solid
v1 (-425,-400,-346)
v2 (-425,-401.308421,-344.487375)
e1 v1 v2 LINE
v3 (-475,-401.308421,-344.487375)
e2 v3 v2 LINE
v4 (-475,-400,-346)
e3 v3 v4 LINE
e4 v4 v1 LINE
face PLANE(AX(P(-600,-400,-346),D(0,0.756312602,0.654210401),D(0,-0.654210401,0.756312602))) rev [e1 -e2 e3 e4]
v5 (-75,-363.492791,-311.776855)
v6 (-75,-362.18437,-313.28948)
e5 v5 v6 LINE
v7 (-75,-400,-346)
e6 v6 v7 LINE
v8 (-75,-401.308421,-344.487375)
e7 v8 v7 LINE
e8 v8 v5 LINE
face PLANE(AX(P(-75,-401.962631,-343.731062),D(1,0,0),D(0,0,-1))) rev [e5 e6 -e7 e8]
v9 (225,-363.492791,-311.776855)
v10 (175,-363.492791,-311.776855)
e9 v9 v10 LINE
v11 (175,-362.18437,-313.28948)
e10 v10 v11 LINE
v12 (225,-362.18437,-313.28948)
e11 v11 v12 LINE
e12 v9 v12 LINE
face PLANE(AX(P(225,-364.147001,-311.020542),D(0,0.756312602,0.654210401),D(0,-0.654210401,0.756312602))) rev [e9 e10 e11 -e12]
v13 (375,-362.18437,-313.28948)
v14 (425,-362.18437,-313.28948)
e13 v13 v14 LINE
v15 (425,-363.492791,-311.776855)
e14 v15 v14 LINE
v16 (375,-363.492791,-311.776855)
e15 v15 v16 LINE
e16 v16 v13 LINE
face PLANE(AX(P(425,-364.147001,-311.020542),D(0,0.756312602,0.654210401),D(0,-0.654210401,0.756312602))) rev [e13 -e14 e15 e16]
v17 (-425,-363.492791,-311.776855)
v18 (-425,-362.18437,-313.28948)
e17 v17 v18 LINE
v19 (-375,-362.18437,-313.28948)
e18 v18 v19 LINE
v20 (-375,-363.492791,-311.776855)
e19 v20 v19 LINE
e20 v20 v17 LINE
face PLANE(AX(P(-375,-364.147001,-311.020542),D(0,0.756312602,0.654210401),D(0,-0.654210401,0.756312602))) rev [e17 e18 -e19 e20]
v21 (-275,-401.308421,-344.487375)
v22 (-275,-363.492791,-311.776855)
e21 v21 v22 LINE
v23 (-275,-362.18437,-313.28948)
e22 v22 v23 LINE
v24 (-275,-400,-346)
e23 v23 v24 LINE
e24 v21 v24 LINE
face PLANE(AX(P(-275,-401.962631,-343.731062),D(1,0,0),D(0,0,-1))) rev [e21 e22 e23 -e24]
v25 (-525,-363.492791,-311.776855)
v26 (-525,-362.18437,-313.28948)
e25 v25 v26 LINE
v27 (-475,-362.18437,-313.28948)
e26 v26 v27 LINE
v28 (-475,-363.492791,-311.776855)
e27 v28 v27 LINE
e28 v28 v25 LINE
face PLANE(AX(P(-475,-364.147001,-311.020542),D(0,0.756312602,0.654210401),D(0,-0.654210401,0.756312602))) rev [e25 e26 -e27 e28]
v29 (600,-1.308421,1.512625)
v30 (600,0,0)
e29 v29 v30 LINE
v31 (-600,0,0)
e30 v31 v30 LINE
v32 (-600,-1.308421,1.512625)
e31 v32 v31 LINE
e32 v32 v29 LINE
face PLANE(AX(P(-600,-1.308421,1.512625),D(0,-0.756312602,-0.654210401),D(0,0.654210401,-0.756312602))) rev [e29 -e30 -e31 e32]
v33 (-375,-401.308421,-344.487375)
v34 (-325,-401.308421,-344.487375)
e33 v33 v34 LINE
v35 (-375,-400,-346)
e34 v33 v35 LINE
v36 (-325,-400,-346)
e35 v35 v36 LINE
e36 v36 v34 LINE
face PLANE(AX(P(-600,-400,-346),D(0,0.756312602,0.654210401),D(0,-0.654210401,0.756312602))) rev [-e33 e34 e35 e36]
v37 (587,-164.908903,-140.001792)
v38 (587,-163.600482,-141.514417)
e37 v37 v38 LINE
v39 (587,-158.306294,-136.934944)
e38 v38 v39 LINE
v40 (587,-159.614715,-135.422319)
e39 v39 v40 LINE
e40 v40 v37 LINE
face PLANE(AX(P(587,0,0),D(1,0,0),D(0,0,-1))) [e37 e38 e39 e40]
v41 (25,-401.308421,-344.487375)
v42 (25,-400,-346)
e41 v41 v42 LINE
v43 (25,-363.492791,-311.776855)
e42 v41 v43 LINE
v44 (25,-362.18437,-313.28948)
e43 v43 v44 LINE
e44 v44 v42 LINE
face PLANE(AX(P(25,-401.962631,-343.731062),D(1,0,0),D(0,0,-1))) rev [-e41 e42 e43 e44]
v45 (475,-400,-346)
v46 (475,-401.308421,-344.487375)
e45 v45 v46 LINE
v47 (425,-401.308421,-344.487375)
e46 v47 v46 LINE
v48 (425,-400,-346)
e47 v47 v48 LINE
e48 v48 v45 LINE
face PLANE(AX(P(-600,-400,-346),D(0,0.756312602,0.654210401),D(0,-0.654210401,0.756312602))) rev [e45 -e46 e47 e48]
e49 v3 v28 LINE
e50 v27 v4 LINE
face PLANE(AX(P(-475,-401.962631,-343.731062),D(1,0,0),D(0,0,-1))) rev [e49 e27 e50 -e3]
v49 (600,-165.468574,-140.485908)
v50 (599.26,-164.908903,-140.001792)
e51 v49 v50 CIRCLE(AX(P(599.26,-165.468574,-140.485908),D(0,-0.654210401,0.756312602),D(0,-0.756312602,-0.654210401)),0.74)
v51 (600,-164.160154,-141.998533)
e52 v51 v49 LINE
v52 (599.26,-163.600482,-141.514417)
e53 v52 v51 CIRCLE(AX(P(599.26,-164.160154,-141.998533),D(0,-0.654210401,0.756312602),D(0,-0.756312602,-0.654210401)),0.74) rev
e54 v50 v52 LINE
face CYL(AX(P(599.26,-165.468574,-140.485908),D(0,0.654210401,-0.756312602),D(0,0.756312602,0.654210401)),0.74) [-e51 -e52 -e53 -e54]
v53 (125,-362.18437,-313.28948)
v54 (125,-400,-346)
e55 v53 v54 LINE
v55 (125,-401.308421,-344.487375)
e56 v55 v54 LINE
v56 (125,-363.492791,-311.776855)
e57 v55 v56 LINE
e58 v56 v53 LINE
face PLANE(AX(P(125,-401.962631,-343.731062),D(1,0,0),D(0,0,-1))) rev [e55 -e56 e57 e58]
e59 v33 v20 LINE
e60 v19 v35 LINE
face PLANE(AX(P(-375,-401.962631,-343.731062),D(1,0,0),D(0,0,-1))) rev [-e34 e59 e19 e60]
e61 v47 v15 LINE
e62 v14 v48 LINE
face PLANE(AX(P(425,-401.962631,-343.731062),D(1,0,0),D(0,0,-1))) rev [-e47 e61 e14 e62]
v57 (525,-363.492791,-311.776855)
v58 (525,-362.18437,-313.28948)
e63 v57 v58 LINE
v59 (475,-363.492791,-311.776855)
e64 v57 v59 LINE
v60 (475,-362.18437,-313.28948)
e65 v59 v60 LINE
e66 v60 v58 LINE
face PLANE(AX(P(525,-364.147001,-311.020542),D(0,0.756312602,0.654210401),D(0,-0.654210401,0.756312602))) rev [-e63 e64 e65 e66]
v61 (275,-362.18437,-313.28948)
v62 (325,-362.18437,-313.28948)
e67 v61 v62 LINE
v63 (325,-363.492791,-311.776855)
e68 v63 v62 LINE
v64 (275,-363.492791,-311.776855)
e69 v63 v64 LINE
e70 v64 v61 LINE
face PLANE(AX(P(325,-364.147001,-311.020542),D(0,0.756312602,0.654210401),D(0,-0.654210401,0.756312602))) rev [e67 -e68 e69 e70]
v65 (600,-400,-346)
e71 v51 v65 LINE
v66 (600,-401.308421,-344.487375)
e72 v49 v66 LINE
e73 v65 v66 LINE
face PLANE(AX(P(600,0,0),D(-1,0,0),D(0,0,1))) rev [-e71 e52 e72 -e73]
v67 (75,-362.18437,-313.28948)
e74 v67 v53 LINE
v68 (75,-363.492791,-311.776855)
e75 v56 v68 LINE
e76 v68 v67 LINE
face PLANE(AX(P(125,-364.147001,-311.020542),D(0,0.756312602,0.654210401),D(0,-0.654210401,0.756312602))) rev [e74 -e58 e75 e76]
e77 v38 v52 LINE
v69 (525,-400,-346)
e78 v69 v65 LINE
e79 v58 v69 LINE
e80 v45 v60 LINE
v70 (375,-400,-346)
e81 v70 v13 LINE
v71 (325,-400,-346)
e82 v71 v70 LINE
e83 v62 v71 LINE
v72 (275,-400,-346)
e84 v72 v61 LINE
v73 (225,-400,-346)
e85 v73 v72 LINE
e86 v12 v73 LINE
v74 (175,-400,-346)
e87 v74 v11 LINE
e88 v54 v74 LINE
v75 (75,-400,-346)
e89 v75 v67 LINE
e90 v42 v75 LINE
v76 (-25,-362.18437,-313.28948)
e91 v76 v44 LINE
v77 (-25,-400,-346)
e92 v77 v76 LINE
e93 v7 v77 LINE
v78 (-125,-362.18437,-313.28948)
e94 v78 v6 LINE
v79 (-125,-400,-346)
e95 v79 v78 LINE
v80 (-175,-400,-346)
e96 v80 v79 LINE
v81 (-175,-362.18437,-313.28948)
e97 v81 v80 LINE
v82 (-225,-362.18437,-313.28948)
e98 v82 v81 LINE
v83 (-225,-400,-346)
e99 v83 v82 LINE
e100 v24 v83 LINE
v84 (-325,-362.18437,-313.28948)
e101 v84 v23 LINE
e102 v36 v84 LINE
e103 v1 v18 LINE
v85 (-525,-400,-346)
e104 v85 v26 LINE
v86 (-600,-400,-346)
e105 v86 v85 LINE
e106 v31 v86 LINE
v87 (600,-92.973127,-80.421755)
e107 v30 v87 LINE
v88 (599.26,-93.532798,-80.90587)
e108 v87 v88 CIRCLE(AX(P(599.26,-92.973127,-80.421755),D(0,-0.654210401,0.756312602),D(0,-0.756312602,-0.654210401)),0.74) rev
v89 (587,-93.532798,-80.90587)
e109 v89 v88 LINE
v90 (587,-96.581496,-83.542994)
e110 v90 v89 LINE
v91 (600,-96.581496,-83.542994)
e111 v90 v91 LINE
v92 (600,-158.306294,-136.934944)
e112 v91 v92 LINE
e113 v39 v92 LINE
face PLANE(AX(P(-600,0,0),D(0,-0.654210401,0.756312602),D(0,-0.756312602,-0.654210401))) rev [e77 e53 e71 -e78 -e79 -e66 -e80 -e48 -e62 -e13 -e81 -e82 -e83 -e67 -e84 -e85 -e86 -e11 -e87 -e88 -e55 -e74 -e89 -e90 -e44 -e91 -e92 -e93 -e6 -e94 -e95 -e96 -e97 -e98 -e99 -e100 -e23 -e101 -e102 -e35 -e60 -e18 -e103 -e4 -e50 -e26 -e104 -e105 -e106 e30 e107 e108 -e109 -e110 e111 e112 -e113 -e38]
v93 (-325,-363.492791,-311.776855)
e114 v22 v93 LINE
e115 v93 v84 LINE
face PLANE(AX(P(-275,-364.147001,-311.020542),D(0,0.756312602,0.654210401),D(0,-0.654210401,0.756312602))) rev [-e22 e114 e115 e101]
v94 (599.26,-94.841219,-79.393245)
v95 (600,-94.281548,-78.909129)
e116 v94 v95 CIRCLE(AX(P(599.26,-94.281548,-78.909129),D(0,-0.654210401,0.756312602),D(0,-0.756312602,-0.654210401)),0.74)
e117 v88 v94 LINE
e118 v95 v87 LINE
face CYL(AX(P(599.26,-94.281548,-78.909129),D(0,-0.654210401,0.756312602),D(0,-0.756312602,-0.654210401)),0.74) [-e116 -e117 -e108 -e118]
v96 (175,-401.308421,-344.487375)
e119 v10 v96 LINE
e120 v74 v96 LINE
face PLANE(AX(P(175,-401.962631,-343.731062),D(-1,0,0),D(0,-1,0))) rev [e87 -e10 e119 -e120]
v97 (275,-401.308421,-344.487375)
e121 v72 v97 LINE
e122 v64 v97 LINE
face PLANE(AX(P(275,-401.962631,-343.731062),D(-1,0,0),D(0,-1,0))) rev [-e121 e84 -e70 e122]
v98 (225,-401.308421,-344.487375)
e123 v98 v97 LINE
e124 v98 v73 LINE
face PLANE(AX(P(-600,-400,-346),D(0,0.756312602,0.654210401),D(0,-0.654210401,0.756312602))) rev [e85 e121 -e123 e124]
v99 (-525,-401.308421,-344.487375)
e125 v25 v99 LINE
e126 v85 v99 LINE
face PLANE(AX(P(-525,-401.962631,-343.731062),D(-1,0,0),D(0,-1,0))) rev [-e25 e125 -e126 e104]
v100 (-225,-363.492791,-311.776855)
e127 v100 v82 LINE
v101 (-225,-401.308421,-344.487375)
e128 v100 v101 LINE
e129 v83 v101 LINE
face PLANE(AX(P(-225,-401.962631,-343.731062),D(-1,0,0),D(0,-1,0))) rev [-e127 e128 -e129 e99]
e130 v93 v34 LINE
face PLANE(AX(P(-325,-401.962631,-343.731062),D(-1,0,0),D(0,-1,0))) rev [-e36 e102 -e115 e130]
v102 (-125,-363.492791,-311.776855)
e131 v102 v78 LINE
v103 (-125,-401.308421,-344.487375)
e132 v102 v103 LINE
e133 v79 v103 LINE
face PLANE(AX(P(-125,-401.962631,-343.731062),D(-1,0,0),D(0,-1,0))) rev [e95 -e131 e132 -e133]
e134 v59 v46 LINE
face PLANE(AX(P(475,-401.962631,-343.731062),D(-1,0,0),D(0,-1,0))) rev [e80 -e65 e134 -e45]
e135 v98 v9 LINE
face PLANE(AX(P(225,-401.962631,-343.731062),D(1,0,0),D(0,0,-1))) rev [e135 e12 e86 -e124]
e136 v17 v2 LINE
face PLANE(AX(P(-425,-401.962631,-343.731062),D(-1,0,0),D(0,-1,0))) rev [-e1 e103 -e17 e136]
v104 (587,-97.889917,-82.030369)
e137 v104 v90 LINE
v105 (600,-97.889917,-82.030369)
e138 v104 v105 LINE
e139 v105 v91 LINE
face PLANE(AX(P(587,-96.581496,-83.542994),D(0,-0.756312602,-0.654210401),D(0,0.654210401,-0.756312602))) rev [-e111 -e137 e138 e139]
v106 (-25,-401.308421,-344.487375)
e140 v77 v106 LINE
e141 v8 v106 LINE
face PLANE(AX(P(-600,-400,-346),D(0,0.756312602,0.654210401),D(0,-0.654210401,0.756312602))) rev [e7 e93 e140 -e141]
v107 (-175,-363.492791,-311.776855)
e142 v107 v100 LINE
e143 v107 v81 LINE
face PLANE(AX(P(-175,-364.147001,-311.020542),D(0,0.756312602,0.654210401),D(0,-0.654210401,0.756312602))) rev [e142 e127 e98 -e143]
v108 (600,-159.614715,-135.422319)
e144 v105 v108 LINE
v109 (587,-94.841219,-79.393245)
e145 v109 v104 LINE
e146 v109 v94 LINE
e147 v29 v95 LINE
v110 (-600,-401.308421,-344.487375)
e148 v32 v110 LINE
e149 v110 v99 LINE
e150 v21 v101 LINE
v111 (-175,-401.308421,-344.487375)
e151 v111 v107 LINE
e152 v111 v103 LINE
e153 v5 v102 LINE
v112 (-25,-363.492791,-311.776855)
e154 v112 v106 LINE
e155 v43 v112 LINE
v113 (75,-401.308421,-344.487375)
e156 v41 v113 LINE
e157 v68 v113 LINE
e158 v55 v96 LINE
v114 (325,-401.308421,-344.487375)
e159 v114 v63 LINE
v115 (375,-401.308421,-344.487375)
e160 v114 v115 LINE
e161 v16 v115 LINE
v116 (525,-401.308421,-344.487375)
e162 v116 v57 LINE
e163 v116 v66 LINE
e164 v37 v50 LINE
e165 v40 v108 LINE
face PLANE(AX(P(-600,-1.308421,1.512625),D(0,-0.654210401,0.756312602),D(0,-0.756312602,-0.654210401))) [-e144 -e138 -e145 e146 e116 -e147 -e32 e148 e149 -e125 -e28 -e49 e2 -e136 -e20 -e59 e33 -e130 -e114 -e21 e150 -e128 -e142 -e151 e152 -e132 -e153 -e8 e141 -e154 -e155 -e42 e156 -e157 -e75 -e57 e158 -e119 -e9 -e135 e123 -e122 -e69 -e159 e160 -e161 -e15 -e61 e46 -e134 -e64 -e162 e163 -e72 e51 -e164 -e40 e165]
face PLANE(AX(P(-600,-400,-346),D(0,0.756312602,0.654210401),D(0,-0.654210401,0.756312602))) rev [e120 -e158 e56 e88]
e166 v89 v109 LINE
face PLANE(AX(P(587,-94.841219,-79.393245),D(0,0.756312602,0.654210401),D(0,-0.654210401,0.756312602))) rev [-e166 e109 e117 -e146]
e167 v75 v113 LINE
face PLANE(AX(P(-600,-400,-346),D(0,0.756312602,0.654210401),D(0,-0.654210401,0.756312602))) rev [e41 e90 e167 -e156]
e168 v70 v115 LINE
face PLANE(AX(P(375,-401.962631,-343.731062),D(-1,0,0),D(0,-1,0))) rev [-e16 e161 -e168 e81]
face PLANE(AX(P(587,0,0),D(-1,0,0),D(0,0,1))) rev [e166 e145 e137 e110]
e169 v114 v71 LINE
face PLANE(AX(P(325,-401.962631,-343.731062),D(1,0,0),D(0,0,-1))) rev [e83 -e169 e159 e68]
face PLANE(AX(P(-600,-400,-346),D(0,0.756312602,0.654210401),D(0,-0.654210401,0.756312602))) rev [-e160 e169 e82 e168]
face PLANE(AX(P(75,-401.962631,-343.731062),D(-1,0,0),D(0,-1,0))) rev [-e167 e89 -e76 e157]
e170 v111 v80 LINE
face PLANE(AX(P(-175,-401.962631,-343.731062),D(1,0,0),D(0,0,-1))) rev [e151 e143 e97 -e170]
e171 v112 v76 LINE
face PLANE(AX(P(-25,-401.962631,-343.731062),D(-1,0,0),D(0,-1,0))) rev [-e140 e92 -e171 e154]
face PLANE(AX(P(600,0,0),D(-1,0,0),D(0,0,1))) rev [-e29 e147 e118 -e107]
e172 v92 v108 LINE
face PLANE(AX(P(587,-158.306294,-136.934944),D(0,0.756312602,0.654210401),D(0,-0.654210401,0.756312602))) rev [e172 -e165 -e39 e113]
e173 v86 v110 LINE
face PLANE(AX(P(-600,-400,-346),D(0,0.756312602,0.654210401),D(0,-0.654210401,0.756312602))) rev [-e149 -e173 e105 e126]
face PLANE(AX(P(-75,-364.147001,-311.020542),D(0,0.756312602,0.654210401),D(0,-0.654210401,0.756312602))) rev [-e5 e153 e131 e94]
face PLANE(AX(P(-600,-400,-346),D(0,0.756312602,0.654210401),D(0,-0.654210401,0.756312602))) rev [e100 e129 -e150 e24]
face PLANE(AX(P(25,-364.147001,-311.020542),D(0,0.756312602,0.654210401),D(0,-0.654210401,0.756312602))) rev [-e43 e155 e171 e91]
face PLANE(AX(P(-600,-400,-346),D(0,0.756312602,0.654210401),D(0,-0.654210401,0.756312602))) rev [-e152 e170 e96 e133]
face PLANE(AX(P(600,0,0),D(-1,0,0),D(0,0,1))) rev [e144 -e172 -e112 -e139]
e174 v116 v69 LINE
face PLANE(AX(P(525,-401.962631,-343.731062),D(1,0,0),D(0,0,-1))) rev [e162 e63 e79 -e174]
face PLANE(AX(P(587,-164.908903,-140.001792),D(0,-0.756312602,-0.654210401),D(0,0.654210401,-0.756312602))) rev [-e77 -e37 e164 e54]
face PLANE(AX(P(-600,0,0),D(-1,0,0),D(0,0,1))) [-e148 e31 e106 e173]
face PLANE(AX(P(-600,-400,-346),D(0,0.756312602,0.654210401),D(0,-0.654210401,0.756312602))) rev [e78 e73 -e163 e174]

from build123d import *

# Parameters (mm, degrees)
BASE_FLANGE1_DEPTH = 600
SKETCH2_W          = 50
SKETCH2_H          = 50
CUT_EXTRUDE1_DEPTH = 10
CUT_EXTRUDE2_DEPTH = 13
FILLET1_R          = 0.74


# Sheet-metal steps are written as plain solids
with BuildPart() as part:
    # Sketch1 → Base-Flange1 (new, symmetric)
    with BuildSketch(Plane(origin=(0, 0, 0), x_dir=(0, 0, -1), z_dir=(1, 0, 0))):
        Polygon((0, 0), (346, -400), (344.487374796, -401.308420801), (-1.512625204, -1.308420801), align=None)
    extrude(amount=BASE_FLANGE1_DEPTH, both=True)

    # Sketch2 → Cut-Extrude1 (cut)
    with BuildSketch(Plane(origin=(0, 0, 0), x_dir=(-1, 0, 0), z_dir=(0, 0.6542104006098486, -0.7563126018610966))):
        with Locations((-500, -503.881839355)):
            Rectangle(SKETCH2_W, SKETCH2_H)
        with Locations((-400, -503.881839355)):
            Rectangle(SKETCH2_W, SKETCH2_H)
        with Locations((-300, -503.881839355)):
            Rectangle(SKETCH2_W, SKETCH2_H)
        with Locations((-200, -503.881839355)):
            Rectangle(SKETCH2_W, SKETCH2_H)
        with Locations((-100, -503.881839355)):
            Rectangle(SKETCH2_W, SKETCH2_H)
        with Locations((0, -503.881839355)):
            Rectangle(SKETCH2_W, SKETCH2_H)
        with Locations((100, -503.881839355)):
            Rectangle(SKETCH2_W, SKETCH2_H)
        with Locations((200, -503.881839355)):
            Rectangle(SKETCH2_W, SKETCH2_H)
        with Locations((300, -503.881839355)):
            Rectangle(SKETCH2_W, SKETCH2_H)
        with Locations((400, -503.881839355)):
            Rectangle(SKETCH2_W, SKETCH2_H)
        with Locations((500, -503.881839355)):
            Rectangle(SKETCH2_W, SKETCH2_H)
    extrude(amount=-CUT_EXTRUDE1_DEPTH, mode=Mode.SUBTRACT)

    # Sketch3 → Cut-Extrude2 (cut)
    with BuildSketch(Plane(origin=(600, 0, 0), x_dir=(0, 0, -1), z_dir=(1, 0, 0))):
        Polygon((136.934944411, -158.306294117), (135.422319207, -159.614714918), (140.001792012, -164.908903131), (141.514417215, -163.60048233), align=None)
        Polygon((80.905870334, -93.532798074), (83.542993835, -96.581495763), (82.030368632, -97.889916565), (79.39324513, -94.841218875), align=None)
    extrude(amount=-CUT_EXTRUDE2_DEPTH, mode=Mode.SUBTRACT)

    # Fillet1
    fillet1_edges = [part.edges().sort_by_distance(p)[0] for p in [
        (600, -164.254692731, -140.758104614),
        (600, -94.187008475, -80.149557732),
    ]]
    fillet(fillet1_edges, radius=FILLET1_R)


solid = part.part
